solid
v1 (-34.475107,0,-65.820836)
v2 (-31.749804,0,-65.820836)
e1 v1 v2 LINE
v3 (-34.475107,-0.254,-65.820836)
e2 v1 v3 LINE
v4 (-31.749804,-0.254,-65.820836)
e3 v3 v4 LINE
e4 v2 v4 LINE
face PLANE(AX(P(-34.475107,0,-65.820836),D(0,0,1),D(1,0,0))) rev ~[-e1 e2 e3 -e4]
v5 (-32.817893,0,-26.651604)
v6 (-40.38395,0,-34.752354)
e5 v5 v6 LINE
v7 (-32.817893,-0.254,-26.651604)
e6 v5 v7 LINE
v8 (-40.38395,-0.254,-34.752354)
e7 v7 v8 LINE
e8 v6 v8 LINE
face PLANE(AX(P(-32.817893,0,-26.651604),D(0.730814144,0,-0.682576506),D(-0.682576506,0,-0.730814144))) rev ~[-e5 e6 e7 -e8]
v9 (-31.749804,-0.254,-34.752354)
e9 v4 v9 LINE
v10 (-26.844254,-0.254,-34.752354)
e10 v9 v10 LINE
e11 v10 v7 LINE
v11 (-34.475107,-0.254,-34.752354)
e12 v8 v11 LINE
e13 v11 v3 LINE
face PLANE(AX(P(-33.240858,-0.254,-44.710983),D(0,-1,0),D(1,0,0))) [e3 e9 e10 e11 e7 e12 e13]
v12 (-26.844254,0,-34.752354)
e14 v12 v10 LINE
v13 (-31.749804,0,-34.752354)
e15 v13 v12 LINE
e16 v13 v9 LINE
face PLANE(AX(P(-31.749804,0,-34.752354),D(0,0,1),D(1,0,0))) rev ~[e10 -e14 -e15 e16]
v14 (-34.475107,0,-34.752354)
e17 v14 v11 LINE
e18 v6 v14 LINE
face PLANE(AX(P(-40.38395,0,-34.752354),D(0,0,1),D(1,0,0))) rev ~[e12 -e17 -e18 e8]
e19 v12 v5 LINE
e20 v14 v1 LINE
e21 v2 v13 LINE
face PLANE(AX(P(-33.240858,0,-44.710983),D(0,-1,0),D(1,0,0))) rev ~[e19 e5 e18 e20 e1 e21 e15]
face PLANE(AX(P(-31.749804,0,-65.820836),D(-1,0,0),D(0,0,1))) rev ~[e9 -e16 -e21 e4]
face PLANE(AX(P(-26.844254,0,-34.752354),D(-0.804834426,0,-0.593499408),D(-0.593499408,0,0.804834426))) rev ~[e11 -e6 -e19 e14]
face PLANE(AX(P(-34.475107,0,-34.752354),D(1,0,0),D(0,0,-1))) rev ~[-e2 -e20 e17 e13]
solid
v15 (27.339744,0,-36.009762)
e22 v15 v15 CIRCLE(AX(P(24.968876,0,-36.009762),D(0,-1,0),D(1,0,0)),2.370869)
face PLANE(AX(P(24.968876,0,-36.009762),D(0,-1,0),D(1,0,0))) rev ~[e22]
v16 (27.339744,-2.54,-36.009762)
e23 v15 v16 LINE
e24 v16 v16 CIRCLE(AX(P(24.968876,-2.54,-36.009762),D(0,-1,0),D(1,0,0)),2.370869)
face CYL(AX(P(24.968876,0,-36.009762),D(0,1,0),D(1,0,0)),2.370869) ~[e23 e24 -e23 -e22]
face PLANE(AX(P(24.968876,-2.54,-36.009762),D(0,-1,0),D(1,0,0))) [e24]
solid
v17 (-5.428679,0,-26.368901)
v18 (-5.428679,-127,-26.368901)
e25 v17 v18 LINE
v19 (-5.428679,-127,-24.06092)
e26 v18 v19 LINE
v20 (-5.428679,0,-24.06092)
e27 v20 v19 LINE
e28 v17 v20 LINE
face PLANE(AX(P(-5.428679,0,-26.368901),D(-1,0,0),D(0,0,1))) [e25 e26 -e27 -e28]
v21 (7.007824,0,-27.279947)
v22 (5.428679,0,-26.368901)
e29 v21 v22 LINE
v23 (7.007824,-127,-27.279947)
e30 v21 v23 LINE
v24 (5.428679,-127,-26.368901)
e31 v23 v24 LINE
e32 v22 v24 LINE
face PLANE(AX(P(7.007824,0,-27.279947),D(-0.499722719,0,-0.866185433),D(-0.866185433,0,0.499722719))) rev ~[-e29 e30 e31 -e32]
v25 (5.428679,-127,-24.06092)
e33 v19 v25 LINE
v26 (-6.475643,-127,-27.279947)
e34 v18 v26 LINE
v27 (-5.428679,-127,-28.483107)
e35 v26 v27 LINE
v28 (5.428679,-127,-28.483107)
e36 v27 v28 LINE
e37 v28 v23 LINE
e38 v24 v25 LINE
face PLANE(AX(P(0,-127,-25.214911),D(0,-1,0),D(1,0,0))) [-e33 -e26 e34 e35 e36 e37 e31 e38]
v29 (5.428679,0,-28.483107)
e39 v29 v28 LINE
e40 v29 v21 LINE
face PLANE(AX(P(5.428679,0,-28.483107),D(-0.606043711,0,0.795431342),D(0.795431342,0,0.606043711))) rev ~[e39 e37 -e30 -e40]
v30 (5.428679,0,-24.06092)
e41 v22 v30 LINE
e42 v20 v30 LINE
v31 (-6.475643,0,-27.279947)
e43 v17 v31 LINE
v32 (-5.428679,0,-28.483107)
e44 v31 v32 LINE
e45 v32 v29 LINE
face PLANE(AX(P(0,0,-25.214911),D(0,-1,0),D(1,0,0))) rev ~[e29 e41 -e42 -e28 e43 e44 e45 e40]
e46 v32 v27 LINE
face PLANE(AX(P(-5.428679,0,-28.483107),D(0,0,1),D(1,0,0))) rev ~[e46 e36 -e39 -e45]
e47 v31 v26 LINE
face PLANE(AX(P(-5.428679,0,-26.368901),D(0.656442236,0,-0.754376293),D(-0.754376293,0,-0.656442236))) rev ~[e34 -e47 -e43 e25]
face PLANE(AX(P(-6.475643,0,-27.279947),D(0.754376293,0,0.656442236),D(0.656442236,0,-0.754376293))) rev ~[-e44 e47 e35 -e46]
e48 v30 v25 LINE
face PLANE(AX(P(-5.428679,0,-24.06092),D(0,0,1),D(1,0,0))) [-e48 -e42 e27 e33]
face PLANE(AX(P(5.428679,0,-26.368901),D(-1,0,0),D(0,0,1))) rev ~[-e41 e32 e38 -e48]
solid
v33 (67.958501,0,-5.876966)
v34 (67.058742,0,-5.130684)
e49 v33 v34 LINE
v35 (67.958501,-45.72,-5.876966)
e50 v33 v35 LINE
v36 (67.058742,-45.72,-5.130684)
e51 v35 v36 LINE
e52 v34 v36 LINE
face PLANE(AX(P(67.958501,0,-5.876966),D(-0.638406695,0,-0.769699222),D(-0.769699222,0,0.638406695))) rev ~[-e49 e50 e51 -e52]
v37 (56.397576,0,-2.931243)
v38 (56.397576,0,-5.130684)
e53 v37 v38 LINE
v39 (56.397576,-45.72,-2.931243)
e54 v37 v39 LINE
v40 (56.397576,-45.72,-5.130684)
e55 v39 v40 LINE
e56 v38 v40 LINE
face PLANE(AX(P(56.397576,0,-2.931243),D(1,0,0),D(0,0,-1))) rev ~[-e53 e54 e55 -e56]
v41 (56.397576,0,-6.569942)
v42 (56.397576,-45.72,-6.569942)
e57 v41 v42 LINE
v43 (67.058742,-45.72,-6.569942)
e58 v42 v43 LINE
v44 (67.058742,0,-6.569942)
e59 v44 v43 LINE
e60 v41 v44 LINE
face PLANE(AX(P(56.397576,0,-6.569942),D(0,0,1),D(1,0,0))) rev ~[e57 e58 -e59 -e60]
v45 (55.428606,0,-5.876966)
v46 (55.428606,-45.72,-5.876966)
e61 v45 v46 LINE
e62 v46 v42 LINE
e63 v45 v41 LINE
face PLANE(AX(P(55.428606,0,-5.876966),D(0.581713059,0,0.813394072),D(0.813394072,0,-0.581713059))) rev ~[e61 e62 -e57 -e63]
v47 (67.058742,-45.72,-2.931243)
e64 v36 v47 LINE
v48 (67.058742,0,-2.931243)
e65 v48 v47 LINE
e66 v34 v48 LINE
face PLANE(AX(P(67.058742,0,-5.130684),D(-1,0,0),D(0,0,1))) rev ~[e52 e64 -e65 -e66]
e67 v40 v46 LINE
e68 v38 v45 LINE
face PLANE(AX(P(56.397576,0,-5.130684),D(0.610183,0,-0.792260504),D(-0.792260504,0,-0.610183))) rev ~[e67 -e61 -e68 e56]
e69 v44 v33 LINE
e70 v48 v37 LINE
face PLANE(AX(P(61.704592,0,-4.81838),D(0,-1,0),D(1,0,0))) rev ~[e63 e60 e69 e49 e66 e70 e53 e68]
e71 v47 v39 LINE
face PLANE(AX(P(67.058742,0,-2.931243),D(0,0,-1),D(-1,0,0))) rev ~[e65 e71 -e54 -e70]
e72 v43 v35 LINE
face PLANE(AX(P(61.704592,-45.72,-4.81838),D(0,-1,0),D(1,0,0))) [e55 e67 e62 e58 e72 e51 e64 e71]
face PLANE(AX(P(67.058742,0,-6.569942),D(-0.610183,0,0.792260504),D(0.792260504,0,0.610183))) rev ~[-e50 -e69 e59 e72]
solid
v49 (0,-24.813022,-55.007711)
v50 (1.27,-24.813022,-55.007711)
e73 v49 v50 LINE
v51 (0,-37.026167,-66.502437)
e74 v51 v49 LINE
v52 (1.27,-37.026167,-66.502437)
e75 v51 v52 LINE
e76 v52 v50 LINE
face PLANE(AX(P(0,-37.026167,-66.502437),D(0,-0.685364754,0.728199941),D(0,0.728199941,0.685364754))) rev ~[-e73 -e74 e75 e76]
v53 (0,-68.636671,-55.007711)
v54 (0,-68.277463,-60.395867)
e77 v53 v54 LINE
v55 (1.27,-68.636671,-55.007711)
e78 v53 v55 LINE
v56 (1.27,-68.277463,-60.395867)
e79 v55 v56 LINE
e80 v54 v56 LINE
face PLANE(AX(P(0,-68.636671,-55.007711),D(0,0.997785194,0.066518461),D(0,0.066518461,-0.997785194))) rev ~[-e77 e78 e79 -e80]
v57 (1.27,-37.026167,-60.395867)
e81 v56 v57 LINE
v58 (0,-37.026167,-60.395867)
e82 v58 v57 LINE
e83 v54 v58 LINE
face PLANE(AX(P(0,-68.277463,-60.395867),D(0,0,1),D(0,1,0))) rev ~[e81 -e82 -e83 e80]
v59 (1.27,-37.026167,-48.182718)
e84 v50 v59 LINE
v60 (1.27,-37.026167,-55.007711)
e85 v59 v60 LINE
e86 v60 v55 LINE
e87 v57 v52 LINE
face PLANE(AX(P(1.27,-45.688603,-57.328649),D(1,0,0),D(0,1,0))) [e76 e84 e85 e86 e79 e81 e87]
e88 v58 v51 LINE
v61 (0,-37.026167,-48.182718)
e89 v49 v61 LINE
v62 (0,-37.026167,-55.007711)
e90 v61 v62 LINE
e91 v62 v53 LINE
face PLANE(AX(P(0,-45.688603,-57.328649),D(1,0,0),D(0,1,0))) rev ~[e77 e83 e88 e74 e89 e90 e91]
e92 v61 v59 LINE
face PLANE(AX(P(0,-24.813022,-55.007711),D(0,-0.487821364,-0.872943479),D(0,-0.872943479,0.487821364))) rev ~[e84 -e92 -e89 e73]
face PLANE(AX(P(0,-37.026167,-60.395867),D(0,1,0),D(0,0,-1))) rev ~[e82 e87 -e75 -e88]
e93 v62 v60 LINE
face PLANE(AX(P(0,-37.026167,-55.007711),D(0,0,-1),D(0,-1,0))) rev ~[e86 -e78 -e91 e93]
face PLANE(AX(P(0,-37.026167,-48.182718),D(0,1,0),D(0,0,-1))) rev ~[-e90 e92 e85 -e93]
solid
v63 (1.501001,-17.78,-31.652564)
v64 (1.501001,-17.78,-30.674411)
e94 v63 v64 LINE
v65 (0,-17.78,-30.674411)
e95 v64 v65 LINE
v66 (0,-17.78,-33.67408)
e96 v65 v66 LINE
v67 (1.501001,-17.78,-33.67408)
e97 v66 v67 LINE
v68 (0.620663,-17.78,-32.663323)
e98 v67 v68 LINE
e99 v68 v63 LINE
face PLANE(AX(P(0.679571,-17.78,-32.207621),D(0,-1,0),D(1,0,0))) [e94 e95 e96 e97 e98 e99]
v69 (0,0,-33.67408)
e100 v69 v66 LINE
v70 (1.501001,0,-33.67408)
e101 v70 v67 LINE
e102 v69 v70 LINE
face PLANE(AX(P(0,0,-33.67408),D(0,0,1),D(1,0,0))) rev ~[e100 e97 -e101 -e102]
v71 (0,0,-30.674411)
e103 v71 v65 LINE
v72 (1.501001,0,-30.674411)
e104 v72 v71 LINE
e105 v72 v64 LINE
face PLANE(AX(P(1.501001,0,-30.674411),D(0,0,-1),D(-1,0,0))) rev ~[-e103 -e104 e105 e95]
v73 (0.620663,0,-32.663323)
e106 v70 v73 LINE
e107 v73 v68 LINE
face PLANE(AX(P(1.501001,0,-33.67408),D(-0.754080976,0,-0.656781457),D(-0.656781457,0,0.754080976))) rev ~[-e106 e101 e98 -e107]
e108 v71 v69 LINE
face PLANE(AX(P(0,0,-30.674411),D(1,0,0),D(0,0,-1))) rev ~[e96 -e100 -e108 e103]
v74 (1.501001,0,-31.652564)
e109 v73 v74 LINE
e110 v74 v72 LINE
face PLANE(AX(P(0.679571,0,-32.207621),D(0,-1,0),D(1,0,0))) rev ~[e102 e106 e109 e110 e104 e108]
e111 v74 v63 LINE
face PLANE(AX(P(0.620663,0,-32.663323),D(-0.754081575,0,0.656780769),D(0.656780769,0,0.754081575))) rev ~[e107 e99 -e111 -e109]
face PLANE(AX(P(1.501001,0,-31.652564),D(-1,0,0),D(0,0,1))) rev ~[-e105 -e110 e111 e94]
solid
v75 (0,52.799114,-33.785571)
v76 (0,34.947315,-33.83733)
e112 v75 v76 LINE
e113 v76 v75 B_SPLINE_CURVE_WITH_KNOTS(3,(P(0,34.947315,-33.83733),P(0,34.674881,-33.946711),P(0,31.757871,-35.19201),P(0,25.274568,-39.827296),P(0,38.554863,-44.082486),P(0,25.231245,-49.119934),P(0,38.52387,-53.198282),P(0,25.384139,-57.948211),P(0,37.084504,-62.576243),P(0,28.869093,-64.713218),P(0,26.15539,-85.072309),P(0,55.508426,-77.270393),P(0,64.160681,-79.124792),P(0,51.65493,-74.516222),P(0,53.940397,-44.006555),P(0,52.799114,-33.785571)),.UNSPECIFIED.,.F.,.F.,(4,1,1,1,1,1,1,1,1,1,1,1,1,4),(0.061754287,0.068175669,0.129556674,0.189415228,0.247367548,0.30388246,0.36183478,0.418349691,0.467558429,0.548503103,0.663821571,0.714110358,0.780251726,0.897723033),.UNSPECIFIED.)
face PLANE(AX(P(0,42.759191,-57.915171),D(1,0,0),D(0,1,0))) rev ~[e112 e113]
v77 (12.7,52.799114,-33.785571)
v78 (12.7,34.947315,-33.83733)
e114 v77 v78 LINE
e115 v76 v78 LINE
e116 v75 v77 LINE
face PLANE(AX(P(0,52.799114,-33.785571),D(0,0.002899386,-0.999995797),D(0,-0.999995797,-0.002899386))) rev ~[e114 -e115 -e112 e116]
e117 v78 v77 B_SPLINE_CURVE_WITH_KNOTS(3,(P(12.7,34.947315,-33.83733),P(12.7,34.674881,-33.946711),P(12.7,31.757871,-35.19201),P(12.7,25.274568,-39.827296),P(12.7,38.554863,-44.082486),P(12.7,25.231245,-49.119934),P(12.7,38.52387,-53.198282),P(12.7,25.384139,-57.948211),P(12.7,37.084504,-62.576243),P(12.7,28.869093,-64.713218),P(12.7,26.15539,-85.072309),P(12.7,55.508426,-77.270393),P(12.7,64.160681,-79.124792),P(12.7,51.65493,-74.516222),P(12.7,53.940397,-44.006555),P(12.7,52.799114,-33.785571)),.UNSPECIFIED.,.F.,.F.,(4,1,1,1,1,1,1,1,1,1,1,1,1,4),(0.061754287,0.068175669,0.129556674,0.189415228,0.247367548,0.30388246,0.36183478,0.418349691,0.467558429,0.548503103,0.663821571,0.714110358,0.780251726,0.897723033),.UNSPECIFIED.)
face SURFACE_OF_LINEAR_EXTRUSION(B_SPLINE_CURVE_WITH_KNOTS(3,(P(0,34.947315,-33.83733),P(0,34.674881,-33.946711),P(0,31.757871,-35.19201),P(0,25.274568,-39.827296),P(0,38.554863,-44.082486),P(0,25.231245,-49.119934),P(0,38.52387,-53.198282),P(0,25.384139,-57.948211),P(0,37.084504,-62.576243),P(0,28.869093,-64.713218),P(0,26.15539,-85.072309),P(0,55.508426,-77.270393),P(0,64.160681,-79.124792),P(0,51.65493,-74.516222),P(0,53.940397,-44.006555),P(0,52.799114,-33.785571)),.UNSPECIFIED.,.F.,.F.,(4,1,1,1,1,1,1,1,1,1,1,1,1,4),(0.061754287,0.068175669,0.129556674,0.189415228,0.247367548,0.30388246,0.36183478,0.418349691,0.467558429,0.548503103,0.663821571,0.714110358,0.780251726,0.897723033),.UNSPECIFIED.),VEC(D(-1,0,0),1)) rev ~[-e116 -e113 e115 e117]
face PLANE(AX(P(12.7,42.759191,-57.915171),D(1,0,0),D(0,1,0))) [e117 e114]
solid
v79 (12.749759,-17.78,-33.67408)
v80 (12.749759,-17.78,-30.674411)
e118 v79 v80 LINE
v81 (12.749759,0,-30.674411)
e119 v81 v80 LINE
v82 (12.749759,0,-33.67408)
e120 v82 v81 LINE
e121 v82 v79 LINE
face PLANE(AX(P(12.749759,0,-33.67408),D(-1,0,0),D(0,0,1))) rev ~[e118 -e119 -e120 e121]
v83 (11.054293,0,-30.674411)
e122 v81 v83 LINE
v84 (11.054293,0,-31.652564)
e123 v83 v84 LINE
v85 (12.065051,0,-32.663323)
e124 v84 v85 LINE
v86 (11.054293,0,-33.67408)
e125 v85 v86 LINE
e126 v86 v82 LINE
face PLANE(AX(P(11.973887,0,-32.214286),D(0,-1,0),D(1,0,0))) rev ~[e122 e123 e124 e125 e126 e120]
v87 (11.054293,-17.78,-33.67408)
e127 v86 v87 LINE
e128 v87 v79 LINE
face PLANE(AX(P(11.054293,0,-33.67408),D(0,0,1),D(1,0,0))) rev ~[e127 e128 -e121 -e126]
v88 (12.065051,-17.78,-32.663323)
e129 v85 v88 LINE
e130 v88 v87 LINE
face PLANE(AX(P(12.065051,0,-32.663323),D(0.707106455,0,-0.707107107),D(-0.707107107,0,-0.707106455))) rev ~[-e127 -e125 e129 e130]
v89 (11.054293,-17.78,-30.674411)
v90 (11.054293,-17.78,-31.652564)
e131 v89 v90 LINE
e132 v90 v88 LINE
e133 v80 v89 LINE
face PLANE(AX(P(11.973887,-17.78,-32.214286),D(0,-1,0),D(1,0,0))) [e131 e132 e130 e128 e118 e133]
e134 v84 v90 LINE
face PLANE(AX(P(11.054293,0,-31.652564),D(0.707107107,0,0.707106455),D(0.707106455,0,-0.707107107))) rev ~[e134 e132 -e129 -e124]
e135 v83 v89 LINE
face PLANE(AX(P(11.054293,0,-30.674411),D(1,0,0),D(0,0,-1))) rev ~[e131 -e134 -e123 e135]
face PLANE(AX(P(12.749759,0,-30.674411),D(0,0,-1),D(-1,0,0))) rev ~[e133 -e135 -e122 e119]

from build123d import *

# Parameters (mm, degrees)
F0_R      = 24.0061288108
F1_DEPTH  = 127
F2_W      = 11.2636005506
F2_H      = 2.7279288042
F3_DEPTH  = 23.495
F4_W      = 10.8573576435
F4_H      = 2.3079812527
F5_DEPTH  = 127
F7_DEPTH  = 12.7
F9_DEPTH  = 17.78
F10_R     = 2.3708686069
F11_DEPTH = 2.54
F13_DEPTH = 0.254
F15_DEPTH = 1.27
F17_DEPTH = 45.72


with BuildPart() as f1:
    # F0 (on Front) → F1 (new body)
    with BuildSketch(Plane.XZ):
        Circle(F0_R)
    extrude(amount=F1_DEPTH)

    # F2 (on Top) → F3 (join, symmetric)
    with BuildSketch(Plane.XY):
        with Locations((-0.0056633726, 1.3639644021)):
            Rectangle(F2_W, F2_H)
        Polygon((-6.6519216634, 3.6306970287), (-5.6374636479, 2.7279288042), (5.6261369027, 2.7279288042), (6.6812695004, 3.6359967198), (5.6261369027, 4.7706630105), (-5.6374636479, 4.7706630105), align=None)
    extrude(amount=F3_DEPTH, both=True)


with BuildPart() as f5:
    # F4 (on Front) → F5 (new body)
    with BuildSketch(Plane.XZ):
        with Locations((0, -25.2149105072)):
            Rectangle(F4_W, F4_H)
        Polygon((7.0078237914, -27.2799469531), (5.4286788218, -26.3689011335), (-5.4286788218, -26.3689011335), (-6.4756427892, -27.2799469531), (-5.4286788218, -28.4831065807), (5.4286788218, -28.4831065807), align=None)
    extrude(amount=F5_DEPTH)


with BuildPart() as f7:
    # F6 (on Right) → F7 (new body)
    with BuildSketch(Plane.YZ):
        with BuildLine():
            Line((52.7991135169, -33.7855707862), (34.947315381, -33.8373302608))
            add(Edge.make_bspline(
                [(34.947315381, -33.8373302608), (34.67488091, -33.9467110369), (31.757870512, -35.1920104732), (25.2745680521, -39.8272956488), (38.5548631415, -44.0824858907), (25.2312448829, -49.1199340969), (38.5238700761, -53.1982819393), (25.3841392291, -57.9482114221), (37.0845041004, -62.5762434591), (28.8690931811, -64.7132175953), (26.1553904819, -85.0723092199), (55.5084259962, -77.2703927863), (64.1606807814, -79.1247921103), (51.6549304079, -74.5162224387), (53.9403970758, -44.0065554038), (52.7991135169, -33.7855707862)],
                knots=[0.0617542874, 0.0617542874, 0.0617542874, 0.0617542874, 0.0681756693, 0.1295566744, 0.1894152283, 0.2473675483, 0.3038824598, 0.3618347798, 0.4183496913, 0.4675584285, 0.5485031035, 0.6638215709, 0.7141103583, 0.7802517263, 0.8977230327, 0.8977230327, 0.8977230327, 0.8977230327], degree=3))
        make_face()
    extrude(amount=F7_DEPTH)


with BuildPart() as f9:
    # F8 (on Front) → F9 (new body)
    with BuildSketch(Plane.XZ):
        Polygon((12.0650511235, -32.6633229852), (11.0542932525, -33.6740799248), (12.749758549, -33.6740799248), (12.749758549, -30.6744109839), (11.0542932525, -30.6744109839), (11.0542932525, -31.6525641829), align=None)
    extrude(amount=F9_DEPTH)


with BuildPart() as f9b:
    # F8 (on Front) → F9, piece 2 (new body)
    with BuildSketch(Plane.XZ):
        Polygon((0, -33.6740799248), (1.5010011848, -33.6740799248), (0.6206628168, -32.6633229852), (1.5010011848, -31.6525641829), (1.5010011848, -30.6744109839), (0, -30.6744109839), align=None)
    extrude(amount=F9_DEPTH)


with BuildPart() as f11:
    # F10 (on Front) → F11 (new body)
    with BuildSketch(Plane.XZ):
        with Locations((24.9688755721, -36.0097624362)):
            Circle(F10_R)
    extrude(amount=F11_DEPTH)


with BuildPart() as f13:
    # F12 (on Front) → F13 (new body)
    with BuildSketch(Plane.XZ):
        Polygon((-40.3839498758, -34.7523540258), (-34.475106746, -34.7523540258), (-34.475106746, -65.8208355308), (-31.7498035729, -65.8208355308), (-31.7498035729, -34.7523540258), (-26.8442537636, -34.7523540258), (-32.8178927302, -26.6516041011), align=None)
    extrude(amount=F13_DEPTH)


with BuildPart() as f15:
    # F14 (on Right) → F15 (new body)
    with BuildSketch(Plane.YZ):
        Polygon((-37.0261669159, -55.0077110529), (-68.6366707087, -55.0077110529), (-68.2774633169, -60.3958666325), (-37.0261669159, -60.3958666325), (-37.0261669159, -66.5024369955), (-24.8130224645, -55.0077110529), (-37.0261669159, -48.1827184558), align=None)
    extrude(amount=F15_DEPTH)


with BuildPart() as f17:
    # F16 (on Front) → F17 (new body)
    with BuildSketch(Plane.XZ):
        Polygon((67.0587420464, -5.1306844689), (67.0587420464, -2.9312425759), (56.3975758851, -2.9312425759), (56.3975758851, -5.1306844689), (55.4286055267, -5.8769658208), (56.3975758851, -6.5699419938), (67.0587420464, -6.5699419938), (67.9585010568, -5.8769658208), align=None)
    extrude(amount=F17_DEPTH)


solid = Compound([f5.part, f7.part, f9.part, f9b.part, f11.part, f13.part, f15.part, f17.part])
